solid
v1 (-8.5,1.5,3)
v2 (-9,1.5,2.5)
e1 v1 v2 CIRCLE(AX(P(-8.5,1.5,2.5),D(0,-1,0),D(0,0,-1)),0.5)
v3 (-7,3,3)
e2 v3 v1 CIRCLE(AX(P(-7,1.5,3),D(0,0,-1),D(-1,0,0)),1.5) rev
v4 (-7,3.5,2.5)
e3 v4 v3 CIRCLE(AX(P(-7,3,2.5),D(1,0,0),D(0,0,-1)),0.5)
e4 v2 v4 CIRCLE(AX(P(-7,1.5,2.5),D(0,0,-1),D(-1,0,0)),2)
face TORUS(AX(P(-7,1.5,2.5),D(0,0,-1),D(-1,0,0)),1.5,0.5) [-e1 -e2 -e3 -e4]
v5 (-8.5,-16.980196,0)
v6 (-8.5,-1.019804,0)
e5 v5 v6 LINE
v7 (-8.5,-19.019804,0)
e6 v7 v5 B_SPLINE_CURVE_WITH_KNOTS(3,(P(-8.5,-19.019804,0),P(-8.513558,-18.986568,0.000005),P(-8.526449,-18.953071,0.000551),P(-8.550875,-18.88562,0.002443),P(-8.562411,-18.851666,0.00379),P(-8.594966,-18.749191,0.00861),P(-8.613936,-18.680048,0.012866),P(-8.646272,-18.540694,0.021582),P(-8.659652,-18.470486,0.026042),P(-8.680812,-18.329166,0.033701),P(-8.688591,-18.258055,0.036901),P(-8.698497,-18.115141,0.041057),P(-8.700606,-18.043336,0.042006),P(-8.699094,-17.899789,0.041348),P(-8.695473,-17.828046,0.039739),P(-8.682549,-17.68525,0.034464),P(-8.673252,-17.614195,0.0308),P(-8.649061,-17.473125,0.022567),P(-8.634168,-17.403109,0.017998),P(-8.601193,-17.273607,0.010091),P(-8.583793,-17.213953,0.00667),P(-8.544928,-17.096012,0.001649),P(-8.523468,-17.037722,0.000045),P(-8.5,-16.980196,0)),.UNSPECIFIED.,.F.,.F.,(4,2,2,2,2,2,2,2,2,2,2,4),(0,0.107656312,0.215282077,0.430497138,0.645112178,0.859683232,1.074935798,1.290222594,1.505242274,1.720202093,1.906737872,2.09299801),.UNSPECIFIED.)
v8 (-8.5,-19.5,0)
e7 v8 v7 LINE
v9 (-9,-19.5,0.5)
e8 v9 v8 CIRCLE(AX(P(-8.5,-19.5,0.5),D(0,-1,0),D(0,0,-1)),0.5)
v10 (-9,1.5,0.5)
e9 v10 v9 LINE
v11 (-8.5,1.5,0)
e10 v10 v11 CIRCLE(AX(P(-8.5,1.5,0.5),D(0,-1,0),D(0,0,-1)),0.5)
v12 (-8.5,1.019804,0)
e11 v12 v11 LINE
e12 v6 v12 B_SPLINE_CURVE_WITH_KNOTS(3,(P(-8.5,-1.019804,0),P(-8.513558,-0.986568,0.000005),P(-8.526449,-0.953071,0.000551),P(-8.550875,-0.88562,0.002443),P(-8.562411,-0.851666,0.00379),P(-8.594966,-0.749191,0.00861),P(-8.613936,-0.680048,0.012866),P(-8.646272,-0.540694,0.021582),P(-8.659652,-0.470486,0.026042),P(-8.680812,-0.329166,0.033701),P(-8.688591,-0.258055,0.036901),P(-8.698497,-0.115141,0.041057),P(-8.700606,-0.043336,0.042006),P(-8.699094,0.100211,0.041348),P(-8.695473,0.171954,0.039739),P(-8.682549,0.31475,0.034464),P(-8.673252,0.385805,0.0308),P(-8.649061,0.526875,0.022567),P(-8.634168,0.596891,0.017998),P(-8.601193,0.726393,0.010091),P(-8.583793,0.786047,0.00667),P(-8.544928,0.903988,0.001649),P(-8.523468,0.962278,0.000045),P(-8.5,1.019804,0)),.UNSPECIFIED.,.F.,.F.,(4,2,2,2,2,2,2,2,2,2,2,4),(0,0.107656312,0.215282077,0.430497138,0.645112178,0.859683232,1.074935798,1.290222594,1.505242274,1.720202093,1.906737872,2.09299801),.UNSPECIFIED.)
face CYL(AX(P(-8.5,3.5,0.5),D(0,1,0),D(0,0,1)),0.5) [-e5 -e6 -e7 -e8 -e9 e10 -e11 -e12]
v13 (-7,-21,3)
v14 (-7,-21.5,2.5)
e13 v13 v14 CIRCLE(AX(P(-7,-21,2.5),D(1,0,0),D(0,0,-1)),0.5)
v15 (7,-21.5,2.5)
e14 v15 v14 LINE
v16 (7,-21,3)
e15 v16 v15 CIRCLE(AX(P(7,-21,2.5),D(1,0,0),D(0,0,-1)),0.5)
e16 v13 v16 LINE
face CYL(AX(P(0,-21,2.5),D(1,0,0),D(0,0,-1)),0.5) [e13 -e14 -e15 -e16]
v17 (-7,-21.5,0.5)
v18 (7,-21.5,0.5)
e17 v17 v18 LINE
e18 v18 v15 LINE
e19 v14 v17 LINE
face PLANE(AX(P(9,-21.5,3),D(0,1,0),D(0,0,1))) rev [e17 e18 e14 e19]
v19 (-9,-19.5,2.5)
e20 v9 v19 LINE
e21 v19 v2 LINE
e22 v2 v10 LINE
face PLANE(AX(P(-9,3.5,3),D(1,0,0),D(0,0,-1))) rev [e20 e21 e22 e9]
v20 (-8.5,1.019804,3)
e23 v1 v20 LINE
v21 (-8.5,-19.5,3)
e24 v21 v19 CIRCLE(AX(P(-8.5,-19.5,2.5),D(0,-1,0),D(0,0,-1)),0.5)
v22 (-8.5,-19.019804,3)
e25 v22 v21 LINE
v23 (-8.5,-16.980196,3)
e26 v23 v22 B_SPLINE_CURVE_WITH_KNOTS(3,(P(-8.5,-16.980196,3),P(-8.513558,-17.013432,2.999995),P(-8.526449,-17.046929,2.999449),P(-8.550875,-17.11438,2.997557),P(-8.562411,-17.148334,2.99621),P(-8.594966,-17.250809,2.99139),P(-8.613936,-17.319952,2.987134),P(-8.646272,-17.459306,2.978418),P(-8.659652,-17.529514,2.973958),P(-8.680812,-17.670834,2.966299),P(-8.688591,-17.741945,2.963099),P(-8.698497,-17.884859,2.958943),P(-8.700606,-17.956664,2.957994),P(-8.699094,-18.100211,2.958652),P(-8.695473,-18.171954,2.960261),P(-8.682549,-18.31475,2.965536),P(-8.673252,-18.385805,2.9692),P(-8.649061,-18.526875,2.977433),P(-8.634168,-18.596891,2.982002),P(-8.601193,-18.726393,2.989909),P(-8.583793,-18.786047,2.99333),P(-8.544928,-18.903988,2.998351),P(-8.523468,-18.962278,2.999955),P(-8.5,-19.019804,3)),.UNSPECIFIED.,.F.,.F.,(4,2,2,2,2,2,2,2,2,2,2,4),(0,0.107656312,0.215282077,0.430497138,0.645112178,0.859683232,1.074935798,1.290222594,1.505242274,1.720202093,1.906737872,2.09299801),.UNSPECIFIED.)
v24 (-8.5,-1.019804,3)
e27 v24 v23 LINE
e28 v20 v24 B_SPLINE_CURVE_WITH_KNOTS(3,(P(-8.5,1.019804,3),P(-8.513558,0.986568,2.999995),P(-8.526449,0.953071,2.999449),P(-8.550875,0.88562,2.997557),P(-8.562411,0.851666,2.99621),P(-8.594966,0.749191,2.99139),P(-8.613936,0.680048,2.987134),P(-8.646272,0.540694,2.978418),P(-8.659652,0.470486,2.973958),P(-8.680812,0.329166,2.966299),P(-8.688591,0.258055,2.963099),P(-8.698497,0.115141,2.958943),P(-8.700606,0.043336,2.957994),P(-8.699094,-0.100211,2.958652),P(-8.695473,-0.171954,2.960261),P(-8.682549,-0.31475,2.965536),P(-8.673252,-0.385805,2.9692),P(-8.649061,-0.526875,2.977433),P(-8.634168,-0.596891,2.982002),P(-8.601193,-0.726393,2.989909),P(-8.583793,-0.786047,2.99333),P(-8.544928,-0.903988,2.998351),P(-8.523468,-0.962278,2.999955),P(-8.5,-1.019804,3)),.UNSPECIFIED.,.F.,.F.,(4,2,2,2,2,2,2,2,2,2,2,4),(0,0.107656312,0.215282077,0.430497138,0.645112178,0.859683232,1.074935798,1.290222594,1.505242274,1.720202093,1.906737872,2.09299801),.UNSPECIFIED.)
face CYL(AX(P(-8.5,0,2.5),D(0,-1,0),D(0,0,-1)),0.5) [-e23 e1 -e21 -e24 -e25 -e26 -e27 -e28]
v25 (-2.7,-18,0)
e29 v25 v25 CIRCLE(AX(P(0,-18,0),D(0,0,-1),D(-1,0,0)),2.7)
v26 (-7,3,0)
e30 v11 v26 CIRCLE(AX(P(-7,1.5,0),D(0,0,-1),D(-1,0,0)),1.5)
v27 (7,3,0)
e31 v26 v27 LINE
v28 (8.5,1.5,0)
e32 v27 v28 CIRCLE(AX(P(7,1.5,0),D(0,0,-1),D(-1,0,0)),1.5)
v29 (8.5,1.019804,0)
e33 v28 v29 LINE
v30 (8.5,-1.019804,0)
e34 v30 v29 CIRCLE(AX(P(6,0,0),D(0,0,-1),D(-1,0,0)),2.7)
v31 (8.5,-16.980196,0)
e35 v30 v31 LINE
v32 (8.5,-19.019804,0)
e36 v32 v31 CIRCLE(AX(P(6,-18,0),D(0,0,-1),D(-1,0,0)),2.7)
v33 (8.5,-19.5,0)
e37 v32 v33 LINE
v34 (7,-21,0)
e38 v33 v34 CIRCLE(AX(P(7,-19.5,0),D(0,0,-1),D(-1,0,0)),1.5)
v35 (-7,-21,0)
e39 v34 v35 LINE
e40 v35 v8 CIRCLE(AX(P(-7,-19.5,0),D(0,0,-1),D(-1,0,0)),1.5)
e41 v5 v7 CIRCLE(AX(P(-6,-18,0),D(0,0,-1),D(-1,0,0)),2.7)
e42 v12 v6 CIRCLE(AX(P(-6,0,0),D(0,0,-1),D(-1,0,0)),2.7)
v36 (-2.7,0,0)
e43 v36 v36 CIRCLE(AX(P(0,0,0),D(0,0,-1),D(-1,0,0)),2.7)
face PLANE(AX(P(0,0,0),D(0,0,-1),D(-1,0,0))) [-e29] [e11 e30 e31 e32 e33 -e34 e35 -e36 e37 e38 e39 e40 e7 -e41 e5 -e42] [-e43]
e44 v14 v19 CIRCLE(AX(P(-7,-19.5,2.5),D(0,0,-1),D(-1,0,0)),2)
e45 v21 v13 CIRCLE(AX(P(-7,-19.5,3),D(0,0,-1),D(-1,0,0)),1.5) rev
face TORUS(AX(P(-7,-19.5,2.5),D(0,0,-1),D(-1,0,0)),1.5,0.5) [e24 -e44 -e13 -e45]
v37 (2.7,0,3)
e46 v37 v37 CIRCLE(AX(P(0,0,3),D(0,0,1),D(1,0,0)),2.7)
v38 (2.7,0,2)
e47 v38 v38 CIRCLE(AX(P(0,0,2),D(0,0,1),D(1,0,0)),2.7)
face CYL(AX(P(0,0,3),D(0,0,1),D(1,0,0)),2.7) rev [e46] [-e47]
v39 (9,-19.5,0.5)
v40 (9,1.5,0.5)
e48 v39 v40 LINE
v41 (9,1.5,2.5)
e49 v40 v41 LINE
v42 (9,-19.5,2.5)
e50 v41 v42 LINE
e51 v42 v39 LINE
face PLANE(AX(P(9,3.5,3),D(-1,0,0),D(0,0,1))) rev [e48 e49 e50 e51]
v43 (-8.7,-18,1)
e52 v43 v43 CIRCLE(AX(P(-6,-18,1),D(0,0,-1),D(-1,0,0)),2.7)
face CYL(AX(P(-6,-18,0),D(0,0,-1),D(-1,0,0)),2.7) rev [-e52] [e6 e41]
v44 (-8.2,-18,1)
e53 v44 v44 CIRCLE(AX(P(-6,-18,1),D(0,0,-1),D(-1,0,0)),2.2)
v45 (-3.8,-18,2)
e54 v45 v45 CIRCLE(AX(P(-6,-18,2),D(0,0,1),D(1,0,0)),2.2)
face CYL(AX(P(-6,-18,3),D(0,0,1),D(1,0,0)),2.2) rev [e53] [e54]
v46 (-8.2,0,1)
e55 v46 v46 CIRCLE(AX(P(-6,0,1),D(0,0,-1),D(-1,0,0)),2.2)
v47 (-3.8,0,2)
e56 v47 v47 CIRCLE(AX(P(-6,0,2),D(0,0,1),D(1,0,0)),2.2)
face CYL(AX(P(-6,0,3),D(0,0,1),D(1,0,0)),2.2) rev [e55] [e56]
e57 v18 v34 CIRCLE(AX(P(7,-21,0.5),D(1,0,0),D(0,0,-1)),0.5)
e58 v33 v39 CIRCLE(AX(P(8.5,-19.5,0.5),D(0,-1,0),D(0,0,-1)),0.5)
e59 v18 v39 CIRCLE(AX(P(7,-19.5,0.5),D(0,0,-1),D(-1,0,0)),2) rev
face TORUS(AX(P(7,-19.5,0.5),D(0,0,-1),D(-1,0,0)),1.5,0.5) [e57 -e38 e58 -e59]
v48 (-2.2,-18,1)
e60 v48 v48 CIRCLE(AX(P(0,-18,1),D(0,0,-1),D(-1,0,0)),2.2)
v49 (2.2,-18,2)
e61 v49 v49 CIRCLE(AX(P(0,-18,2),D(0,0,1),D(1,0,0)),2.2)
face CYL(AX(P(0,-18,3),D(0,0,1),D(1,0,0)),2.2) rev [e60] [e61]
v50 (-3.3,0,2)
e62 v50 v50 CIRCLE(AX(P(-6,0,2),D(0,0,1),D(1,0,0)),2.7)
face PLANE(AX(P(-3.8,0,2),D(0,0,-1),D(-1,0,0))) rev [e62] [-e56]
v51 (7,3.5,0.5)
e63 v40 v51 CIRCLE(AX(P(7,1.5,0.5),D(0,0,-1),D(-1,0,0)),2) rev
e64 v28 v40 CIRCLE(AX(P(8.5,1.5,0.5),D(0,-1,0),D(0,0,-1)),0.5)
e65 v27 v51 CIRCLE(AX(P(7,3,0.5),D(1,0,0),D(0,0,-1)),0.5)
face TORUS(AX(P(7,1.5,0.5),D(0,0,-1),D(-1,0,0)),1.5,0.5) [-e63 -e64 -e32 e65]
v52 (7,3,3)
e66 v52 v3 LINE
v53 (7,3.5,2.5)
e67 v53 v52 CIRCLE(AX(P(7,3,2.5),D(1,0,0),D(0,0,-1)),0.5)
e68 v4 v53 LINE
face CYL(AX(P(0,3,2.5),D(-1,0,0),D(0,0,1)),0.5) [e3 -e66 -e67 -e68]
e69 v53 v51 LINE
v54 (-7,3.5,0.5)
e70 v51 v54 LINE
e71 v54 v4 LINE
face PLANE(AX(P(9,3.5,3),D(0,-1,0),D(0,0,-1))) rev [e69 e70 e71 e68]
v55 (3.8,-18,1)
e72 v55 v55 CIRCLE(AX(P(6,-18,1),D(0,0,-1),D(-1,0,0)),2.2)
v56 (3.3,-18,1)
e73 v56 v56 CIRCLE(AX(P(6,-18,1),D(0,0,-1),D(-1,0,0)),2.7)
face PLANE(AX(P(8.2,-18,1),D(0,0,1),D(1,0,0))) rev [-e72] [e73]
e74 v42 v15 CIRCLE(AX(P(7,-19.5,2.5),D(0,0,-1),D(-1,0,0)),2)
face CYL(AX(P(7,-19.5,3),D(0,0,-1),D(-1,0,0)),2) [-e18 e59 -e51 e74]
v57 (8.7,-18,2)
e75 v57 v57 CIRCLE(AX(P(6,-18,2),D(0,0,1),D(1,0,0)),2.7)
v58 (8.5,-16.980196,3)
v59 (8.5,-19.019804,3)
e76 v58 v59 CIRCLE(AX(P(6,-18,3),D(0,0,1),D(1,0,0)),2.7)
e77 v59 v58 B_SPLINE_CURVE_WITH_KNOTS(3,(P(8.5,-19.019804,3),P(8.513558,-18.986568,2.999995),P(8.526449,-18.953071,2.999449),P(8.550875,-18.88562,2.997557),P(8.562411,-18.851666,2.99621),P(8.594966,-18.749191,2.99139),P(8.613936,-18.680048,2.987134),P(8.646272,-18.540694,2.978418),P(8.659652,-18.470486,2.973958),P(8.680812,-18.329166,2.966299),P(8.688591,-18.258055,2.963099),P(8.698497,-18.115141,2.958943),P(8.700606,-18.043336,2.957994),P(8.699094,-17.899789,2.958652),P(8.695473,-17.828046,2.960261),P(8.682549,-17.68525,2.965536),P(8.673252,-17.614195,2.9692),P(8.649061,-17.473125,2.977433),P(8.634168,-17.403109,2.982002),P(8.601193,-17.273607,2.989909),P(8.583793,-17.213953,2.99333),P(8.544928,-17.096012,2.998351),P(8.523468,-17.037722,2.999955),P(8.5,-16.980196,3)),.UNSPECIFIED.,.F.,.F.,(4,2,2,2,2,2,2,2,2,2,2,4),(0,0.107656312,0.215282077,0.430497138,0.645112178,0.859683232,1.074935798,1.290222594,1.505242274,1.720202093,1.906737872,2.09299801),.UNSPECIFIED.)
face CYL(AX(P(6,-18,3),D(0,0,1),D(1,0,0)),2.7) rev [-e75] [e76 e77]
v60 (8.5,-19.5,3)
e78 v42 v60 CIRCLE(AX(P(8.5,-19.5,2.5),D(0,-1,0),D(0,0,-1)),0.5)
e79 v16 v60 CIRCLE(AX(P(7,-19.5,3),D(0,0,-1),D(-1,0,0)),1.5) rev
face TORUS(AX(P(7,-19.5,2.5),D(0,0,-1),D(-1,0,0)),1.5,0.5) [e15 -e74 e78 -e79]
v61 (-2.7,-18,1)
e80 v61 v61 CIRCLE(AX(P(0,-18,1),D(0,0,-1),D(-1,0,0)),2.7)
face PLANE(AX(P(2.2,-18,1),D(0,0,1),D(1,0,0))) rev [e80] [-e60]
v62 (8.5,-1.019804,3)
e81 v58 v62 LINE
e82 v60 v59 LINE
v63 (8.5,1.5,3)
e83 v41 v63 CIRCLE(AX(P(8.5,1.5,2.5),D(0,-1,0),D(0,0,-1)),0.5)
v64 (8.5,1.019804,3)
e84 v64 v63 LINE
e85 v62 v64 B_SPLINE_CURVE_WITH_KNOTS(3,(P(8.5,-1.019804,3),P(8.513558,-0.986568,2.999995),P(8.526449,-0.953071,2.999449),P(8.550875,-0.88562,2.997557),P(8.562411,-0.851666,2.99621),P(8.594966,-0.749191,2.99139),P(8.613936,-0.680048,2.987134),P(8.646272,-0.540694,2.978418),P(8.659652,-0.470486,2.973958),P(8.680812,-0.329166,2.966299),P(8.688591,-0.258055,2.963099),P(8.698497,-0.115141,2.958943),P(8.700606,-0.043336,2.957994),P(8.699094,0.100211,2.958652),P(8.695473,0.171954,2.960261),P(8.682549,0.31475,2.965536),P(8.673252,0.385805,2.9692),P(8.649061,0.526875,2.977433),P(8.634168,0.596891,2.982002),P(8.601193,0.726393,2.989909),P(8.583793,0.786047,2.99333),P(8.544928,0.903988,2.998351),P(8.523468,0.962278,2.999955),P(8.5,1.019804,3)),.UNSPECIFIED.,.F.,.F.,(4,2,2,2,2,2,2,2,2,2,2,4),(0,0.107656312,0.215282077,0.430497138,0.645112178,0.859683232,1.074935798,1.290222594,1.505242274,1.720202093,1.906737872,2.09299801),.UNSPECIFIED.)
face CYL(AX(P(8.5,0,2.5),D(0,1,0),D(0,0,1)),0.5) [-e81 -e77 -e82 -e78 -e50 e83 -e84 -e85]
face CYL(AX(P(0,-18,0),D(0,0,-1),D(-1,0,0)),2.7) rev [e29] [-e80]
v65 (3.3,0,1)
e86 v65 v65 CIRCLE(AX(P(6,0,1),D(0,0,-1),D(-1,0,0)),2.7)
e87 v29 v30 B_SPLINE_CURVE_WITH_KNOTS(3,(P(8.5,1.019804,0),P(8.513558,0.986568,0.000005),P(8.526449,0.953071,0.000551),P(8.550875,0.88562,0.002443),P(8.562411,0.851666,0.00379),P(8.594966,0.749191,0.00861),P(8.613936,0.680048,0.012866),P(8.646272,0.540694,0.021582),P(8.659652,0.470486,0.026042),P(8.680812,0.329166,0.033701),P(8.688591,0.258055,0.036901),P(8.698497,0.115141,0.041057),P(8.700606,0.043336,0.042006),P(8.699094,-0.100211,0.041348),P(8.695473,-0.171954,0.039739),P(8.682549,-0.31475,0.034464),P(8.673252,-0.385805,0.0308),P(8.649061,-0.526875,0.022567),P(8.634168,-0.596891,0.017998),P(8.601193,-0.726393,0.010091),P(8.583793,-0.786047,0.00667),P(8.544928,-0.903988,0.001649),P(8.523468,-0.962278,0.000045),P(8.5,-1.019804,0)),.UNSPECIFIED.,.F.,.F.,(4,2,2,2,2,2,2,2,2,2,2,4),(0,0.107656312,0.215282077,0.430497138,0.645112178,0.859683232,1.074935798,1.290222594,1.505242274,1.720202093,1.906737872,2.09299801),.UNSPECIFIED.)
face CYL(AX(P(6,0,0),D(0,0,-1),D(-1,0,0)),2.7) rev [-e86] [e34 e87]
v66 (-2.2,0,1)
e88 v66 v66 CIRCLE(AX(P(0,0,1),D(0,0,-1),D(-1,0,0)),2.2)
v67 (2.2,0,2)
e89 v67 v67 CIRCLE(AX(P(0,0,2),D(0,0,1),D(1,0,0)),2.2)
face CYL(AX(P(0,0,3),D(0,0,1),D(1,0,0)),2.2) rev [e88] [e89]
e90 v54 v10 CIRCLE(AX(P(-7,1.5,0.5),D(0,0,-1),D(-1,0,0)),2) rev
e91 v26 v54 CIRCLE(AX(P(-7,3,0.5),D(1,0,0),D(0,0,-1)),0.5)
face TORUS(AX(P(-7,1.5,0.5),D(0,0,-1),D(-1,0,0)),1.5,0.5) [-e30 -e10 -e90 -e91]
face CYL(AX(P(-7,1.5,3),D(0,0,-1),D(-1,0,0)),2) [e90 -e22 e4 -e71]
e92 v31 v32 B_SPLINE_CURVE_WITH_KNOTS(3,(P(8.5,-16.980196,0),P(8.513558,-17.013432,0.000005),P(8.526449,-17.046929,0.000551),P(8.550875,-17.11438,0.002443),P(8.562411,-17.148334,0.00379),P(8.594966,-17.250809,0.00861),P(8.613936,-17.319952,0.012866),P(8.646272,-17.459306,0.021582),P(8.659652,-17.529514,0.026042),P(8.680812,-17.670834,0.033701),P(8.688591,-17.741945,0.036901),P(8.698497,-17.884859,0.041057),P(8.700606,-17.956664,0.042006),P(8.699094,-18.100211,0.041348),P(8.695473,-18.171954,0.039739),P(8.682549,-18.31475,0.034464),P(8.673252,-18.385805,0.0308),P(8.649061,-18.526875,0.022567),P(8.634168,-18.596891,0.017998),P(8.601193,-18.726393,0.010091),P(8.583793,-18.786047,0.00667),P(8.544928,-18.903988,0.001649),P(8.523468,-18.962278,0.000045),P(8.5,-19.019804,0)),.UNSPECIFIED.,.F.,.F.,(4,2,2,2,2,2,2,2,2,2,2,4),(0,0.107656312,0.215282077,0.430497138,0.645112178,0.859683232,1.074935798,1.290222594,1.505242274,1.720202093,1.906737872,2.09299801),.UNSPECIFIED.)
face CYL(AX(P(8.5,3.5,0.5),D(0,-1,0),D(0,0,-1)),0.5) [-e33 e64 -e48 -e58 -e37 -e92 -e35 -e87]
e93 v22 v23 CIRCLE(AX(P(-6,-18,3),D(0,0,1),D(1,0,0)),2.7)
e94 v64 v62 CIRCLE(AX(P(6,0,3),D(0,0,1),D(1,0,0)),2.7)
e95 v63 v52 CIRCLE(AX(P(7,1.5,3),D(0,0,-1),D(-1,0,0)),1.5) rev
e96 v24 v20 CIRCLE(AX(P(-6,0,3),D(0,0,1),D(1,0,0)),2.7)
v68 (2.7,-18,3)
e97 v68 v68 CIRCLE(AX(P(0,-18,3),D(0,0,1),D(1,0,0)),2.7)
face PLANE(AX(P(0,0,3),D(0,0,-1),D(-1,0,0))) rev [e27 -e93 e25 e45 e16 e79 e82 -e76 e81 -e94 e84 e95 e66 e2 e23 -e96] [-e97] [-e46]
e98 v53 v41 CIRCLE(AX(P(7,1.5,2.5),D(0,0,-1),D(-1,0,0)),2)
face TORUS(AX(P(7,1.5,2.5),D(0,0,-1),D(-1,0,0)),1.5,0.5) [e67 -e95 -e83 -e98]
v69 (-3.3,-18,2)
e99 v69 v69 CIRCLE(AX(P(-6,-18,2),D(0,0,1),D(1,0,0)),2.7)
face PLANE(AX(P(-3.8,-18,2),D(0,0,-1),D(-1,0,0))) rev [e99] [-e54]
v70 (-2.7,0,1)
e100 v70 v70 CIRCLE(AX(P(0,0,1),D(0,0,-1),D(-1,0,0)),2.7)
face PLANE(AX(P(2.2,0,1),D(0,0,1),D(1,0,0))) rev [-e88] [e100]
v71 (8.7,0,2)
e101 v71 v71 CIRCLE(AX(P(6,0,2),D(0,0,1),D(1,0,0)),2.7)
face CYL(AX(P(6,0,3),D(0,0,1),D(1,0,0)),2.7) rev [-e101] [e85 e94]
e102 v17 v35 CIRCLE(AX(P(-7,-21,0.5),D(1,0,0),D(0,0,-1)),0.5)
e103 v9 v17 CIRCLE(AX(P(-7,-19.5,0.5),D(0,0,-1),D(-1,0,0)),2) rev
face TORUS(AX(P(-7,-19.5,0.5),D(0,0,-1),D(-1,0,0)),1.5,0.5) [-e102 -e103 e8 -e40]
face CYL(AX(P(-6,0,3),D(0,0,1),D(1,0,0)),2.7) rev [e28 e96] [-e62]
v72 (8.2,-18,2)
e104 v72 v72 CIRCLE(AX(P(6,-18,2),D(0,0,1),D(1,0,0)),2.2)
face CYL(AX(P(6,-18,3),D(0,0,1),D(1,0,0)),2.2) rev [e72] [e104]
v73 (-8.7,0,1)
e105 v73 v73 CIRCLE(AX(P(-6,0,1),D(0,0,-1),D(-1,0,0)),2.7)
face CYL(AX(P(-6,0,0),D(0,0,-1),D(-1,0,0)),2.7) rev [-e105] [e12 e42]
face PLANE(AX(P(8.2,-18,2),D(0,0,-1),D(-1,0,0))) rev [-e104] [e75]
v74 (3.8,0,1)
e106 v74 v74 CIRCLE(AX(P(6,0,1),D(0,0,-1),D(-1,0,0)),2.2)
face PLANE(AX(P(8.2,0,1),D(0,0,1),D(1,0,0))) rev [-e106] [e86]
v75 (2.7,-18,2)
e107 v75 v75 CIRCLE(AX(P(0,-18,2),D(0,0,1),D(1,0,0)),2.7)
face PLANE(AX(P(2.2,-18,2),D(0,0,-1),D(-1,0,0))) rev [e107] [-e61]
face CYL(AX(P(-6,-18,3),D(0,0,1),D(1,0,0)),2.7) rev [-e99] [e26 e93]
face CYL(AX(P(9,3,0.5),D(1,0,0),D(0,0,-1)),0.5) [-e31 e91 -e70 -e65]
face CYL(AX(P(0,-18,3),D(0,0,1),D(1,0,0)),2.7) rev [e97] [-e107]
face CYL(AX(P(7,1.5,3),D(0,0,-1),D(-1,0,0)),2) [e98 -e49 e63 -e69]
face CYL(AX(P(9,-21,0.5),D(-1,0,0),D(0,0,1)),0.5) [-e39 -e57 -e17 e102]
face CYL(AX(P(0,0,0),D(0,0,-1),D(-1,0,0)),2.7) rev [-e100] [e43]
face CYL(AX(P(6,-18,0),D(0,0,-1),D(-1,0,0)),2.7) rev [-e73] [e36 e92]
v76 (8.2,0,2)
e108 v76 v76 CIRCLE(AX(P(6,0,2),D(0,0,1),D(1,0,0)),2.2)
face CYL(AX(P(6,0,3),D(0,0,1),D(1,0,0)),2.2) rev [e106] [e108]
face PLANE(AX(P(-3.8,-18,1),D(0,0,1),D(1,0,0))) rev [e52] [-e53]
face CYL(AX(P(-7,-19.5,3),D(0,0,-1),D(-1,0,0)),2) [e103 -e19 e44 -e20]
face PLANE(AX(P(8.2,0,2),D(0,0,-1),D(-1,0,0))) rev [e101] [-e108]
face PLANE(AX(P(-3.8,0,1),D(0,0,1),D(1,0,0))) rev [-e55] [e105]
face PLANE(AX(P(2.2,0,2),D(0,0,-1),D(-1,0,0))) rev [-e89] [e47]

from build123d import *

# Parameters (mm, degrees)
SKETCH1_W           = 18
SKETCH1_H           = 25
BOSS_EXTRUDE1_DEPTH = 3
HOLE1_D             = 4.4
HOLE1_DEPTH         = 100
HOLE1_CBORE_D       = 5.4
HOLE1_CBORE_DEPTH   = 1
HOLE2_D             = 4.4
HOLE2_DEPTH         = 100
HOLE2_CBORE_D       = 5.4
HOLE2_CBORE_DEPTH   = 1
FILLET1_R           = 2
FILLET2_R           = 0.5


with BuildPart() as part:
    # Sketch1 → Boss-Extrude1 (new body)
    with BuildSketch(Plane.XY):
        with Locations((0, -9)):
            Rectangle(SKETCH1_W, SKETCH1_H)
    extrude(amount=BOSS_EXTRUDE1_DEPTH)

    # Hole1
    with Locations(Plane.XY.offset(3)):
        with Locations((-6, 0), (0, 0), (6, 0), (-6, -18), (0, -18), (6, -18)):
            CounterBoreHole(HOLE1_D / 2, HOLE1_CBORE_D / 2, HOLE1_CBORE_DEPTH, depth=HOLE1_DEPTH)

    # Hole2
    with Locations(Plane(origin=(0, 0, 0), x_dir=(-1, 0, 0), z_dir=(0, 0, -1))):
        with Locations((-6, 0), (0, 0), (6, 0), (6, -18), (0, -18), (-6, -18)):
            CounterBoreHole(HOLE2_D / 2, HOLE2_CBORE_D / 2, HOLE2_CBORE_DEPTH, depth=HOLE2_DEPTH)

    # Fillet1
    fillet1_edges = [part.edges().sort_by_distance(p)[0] for p in [
        (9, -21.5, 1.5),
        (-9, -21.5, 1.5),
        (-9, 3.5, 1.5),
        (9, 3.5, 1.5),
    ]]
    fillet(fillet1_edges, radius=FILLET1_R)

    # Fillet2
    # the kernel refuses this fillet: 0.5 mm, written as the material it takes off along each edge
    with BuildSketch(Plane(origin=(9, -19.5, 0), x_dir=(-1, 0, 0), z_dir=(0, 1, 0)), Plane(origin=(-9, 1.5, 0), x_dir=(1, 0, 0), z_dir=(0, -1, 0))) as fillet2_piece_1:
        with BuildLine():
            CenterArc((FILLET2_R, FILLET2_R), FILLET2_R, 180, 90)
            Line((0, FILLET2_R), (0, 0))
            Line((0, 0), (FILLET2_R, 0))
        make_face()
    extrude(amount=21, mode=Mode.SUBTRACT)
    with BuildSketch(Plane(origin=(9, -19.5, 3), x_dir=(-1, 0, 0), z_dir=(0, 1, 0)), Plane(origin=(-9, 1.5, 3), x_dir=(1, 0, 0), z_dir=(0, -1, 0))) as fillet2_piece_2:
        with BuildLine():
            CenterArc((FILLET2_R, -FILLET2_R), FILLET2_R, 90, 90)
            Line((0, -FILLET2_R), (0, 0))
            Line((0, 0), (FILLET2_R, 0))
        make_face()
    extrude(amount=21, mode=Mode.SUBTRACT)
    with BuildSketch(Plane(origin=(-7, -21.5, 0), x_dir=(0, 1, 0), z_dir=(1, 0, 0)), Plane(origin=(7, 3.5, 3), x_dir=(0, 0, -1), z_dir=(-1, 0, 0))) as fillet2_piece_3:
        with BuildLine():
            CenterArc((FILLET2_R, FILLET2_R), FILLET2_R, 180, 90)
            Line((0, FILLET2_R), (0, 0))
            Line((0, 0), (FILLET2_R, 0))
        make_face()
    extrude(amount=14, mode=Mode.SUBTRACT)
    with BuildSketch(Plane(origin=(7, 3.5, 0), x_dir=(0, 0, 1), z_dir=(-1, 0, 0)), Plane(origin=(-7, -21.5, 3), x_dir=(0, 1, 0), z_dir=(1, 0, 0))) as fillet2_piece_4:
        with BuildLine():
            CenterArc((FILLET2_R, -FILLET2_R), FILLET2_R, 90, 90)
            Line((0, -FILLET2_R), (0, 0))
            Line((0, 0), (FILLET2_R, 0))
        make_face()
    extrude(amount=14, mode=Mode.SUBTRACT)
    with BuildSketch(Plane(origin=(7, 1.5, 0), x_dir=(0, 1, 0), z_dir=(-1, 0, 0))) as fillet2_piece_5:
        with BuildLine():
            CenterArc((2 - FILLET2_R, -FILLET2_R), FILLET2_R, 0, 90)
            Line((2, -FILLET2_R), (2, 0))
            Line((2, 0), (2 - FILLET2_R, 0))
        make_face()
    revolve(axis=Axis((7, 1.5, 0), (0, 0, -1)), revolution_arc=90, mode=Mode.SUBTRACT)
    with BuildSketch(Plane(origin=(-7, 1.5, 0), x_dir=(0, 1, 0), z_dir=(1, 0, 0))) as fillet2_piece_6:
        with BuildLine():
            CenterArc((2 - FILLET2_R, FILLET2_R), FILLET2_R, 270, 90)
            Line((2, FILLET2_R), (2, 0))
            Line((2, 0), (2 - FILLET2_R, 0))
        make_face()
    revolve(axis=Axis((-7, 1.5, 0), (0, 0, 1)), revolution_arc=90, mode=Mode.SUBTRACT)
    with BuildSketch(Plane(origin=(-7, -19.5, 0), x_dir=(0, -1, 0), z_dir=(1, 0, 0))) as fillet2_piece_7:
        with BuildLine():
            CenterArc((2 - FILLET2_R, -FILLET2_R), FILLET2_R, 0, 90)
            Line((2, -FILLET2_R), (2, 0))
            Line((2, 0), (2 - FILLET2_R, 0))
        make_face()
    revolve(axis=Axis((-7, -19.5, 0), (0, 0, -1)), revolution_arc=90, mode=Mode.SUBTRACT)
    with BuildSketch(Plane(origin=(7, -19.5, 0), x_dir=(0, -1, 0), z_dir=(-1, 0, 0))) as fillet2_piece_8:
        with BuildLine():
            CenterArc((2 - FILLET2_R, FILLET2_R), FILLET2_R, 270, 90)
            Line((2, FILLET2_R), (2, 0))
            Line((2, 0), (2 - FILLET2_R, 0))
        make_face()
    revolve(axis=Axis((7, -19.5, 0), (0, 0, 1)), revolution_arc=90, mode=Mode.SUBTRACT)
    with BuildSketch(Plane(origin=(7, 1.5, 3), x_dir=(0, 1, 0), z_dir=(-1, 0, 0))) as fillet2_piece_9:
        with BuildLine():
            CenterArc((2 - FILLET2_R, FILLET2_R), FILLET2_R, 270, 90)
            Line((2 - FILLET2_R, 0), (2, 0))
            Line((2, 0), (2, FILLET2_R))
        make_face()
    revolve(axis=Axis((7, 1.5, 3), (0, 0, -1)), revolution_arc=90, mode=Mode.SUBTRACT)
    with BuildSketch(Plane(origin=(-7, 1.5, 3), x_dir=(0, 1, 0), z_dir=(1, 0, 0))) as fillet2_piece_10:
        with BuildLine():
            CenterArc((2 - FILLET2_R, -FILLET2_R), FILLET2_R, 0, 90)
            Line((2 - FILLET2_R, 0), (2, 0))
            Line((2, 0), (2, -FILLET2_R))
        make_face()
    revolve(axis=Axis((-7, 1.5, 3), (0, 0, 1)), revolution_arc=90, mode=Mode.SUBTRACT)
    with BuildSketch(Plane(origin=(-7, -19.5, 3), x_dir=(0, -1, 0), z_dir=(1, 0, 0))) as fillet2_piece_11:
        with BuildLine():
            CenterArc((2 - FILLET2_R, FILLET2_R), FILLET2_R, 270, 90)
            Line((2, FILLET2_R), (2, 0))
            Line((2, 0), (2 - FILLET2_R, 0))
        make_face()
    revolve(axis=Axis((-7, -19.5, 3), (0, 0, -1)), revolution_arc=90, mode=Mode.SUBTRACT)
    with BuildSketch(Plane(origin=(7, -19.5, 3), x_dir=(0, -1, 0), z_dir=(-1, 0, 0))) as fillet2_piece_12:
        with BuildLine():
            CenterArc((2 - FILLET2_R, -FILLET2_R), FILLET2_R, 0, 90)
            Line((2, -FILLET2_R), (2, 0))
            Line((2, 0), (2 - FILLET2_R, 0))
        make_face()
    revolve(axis=Axis((7, -19.5, 3), (0, 0, 1)), revolution_arc=90, mode=Mode.SUBTRACT)


solid = part.part
